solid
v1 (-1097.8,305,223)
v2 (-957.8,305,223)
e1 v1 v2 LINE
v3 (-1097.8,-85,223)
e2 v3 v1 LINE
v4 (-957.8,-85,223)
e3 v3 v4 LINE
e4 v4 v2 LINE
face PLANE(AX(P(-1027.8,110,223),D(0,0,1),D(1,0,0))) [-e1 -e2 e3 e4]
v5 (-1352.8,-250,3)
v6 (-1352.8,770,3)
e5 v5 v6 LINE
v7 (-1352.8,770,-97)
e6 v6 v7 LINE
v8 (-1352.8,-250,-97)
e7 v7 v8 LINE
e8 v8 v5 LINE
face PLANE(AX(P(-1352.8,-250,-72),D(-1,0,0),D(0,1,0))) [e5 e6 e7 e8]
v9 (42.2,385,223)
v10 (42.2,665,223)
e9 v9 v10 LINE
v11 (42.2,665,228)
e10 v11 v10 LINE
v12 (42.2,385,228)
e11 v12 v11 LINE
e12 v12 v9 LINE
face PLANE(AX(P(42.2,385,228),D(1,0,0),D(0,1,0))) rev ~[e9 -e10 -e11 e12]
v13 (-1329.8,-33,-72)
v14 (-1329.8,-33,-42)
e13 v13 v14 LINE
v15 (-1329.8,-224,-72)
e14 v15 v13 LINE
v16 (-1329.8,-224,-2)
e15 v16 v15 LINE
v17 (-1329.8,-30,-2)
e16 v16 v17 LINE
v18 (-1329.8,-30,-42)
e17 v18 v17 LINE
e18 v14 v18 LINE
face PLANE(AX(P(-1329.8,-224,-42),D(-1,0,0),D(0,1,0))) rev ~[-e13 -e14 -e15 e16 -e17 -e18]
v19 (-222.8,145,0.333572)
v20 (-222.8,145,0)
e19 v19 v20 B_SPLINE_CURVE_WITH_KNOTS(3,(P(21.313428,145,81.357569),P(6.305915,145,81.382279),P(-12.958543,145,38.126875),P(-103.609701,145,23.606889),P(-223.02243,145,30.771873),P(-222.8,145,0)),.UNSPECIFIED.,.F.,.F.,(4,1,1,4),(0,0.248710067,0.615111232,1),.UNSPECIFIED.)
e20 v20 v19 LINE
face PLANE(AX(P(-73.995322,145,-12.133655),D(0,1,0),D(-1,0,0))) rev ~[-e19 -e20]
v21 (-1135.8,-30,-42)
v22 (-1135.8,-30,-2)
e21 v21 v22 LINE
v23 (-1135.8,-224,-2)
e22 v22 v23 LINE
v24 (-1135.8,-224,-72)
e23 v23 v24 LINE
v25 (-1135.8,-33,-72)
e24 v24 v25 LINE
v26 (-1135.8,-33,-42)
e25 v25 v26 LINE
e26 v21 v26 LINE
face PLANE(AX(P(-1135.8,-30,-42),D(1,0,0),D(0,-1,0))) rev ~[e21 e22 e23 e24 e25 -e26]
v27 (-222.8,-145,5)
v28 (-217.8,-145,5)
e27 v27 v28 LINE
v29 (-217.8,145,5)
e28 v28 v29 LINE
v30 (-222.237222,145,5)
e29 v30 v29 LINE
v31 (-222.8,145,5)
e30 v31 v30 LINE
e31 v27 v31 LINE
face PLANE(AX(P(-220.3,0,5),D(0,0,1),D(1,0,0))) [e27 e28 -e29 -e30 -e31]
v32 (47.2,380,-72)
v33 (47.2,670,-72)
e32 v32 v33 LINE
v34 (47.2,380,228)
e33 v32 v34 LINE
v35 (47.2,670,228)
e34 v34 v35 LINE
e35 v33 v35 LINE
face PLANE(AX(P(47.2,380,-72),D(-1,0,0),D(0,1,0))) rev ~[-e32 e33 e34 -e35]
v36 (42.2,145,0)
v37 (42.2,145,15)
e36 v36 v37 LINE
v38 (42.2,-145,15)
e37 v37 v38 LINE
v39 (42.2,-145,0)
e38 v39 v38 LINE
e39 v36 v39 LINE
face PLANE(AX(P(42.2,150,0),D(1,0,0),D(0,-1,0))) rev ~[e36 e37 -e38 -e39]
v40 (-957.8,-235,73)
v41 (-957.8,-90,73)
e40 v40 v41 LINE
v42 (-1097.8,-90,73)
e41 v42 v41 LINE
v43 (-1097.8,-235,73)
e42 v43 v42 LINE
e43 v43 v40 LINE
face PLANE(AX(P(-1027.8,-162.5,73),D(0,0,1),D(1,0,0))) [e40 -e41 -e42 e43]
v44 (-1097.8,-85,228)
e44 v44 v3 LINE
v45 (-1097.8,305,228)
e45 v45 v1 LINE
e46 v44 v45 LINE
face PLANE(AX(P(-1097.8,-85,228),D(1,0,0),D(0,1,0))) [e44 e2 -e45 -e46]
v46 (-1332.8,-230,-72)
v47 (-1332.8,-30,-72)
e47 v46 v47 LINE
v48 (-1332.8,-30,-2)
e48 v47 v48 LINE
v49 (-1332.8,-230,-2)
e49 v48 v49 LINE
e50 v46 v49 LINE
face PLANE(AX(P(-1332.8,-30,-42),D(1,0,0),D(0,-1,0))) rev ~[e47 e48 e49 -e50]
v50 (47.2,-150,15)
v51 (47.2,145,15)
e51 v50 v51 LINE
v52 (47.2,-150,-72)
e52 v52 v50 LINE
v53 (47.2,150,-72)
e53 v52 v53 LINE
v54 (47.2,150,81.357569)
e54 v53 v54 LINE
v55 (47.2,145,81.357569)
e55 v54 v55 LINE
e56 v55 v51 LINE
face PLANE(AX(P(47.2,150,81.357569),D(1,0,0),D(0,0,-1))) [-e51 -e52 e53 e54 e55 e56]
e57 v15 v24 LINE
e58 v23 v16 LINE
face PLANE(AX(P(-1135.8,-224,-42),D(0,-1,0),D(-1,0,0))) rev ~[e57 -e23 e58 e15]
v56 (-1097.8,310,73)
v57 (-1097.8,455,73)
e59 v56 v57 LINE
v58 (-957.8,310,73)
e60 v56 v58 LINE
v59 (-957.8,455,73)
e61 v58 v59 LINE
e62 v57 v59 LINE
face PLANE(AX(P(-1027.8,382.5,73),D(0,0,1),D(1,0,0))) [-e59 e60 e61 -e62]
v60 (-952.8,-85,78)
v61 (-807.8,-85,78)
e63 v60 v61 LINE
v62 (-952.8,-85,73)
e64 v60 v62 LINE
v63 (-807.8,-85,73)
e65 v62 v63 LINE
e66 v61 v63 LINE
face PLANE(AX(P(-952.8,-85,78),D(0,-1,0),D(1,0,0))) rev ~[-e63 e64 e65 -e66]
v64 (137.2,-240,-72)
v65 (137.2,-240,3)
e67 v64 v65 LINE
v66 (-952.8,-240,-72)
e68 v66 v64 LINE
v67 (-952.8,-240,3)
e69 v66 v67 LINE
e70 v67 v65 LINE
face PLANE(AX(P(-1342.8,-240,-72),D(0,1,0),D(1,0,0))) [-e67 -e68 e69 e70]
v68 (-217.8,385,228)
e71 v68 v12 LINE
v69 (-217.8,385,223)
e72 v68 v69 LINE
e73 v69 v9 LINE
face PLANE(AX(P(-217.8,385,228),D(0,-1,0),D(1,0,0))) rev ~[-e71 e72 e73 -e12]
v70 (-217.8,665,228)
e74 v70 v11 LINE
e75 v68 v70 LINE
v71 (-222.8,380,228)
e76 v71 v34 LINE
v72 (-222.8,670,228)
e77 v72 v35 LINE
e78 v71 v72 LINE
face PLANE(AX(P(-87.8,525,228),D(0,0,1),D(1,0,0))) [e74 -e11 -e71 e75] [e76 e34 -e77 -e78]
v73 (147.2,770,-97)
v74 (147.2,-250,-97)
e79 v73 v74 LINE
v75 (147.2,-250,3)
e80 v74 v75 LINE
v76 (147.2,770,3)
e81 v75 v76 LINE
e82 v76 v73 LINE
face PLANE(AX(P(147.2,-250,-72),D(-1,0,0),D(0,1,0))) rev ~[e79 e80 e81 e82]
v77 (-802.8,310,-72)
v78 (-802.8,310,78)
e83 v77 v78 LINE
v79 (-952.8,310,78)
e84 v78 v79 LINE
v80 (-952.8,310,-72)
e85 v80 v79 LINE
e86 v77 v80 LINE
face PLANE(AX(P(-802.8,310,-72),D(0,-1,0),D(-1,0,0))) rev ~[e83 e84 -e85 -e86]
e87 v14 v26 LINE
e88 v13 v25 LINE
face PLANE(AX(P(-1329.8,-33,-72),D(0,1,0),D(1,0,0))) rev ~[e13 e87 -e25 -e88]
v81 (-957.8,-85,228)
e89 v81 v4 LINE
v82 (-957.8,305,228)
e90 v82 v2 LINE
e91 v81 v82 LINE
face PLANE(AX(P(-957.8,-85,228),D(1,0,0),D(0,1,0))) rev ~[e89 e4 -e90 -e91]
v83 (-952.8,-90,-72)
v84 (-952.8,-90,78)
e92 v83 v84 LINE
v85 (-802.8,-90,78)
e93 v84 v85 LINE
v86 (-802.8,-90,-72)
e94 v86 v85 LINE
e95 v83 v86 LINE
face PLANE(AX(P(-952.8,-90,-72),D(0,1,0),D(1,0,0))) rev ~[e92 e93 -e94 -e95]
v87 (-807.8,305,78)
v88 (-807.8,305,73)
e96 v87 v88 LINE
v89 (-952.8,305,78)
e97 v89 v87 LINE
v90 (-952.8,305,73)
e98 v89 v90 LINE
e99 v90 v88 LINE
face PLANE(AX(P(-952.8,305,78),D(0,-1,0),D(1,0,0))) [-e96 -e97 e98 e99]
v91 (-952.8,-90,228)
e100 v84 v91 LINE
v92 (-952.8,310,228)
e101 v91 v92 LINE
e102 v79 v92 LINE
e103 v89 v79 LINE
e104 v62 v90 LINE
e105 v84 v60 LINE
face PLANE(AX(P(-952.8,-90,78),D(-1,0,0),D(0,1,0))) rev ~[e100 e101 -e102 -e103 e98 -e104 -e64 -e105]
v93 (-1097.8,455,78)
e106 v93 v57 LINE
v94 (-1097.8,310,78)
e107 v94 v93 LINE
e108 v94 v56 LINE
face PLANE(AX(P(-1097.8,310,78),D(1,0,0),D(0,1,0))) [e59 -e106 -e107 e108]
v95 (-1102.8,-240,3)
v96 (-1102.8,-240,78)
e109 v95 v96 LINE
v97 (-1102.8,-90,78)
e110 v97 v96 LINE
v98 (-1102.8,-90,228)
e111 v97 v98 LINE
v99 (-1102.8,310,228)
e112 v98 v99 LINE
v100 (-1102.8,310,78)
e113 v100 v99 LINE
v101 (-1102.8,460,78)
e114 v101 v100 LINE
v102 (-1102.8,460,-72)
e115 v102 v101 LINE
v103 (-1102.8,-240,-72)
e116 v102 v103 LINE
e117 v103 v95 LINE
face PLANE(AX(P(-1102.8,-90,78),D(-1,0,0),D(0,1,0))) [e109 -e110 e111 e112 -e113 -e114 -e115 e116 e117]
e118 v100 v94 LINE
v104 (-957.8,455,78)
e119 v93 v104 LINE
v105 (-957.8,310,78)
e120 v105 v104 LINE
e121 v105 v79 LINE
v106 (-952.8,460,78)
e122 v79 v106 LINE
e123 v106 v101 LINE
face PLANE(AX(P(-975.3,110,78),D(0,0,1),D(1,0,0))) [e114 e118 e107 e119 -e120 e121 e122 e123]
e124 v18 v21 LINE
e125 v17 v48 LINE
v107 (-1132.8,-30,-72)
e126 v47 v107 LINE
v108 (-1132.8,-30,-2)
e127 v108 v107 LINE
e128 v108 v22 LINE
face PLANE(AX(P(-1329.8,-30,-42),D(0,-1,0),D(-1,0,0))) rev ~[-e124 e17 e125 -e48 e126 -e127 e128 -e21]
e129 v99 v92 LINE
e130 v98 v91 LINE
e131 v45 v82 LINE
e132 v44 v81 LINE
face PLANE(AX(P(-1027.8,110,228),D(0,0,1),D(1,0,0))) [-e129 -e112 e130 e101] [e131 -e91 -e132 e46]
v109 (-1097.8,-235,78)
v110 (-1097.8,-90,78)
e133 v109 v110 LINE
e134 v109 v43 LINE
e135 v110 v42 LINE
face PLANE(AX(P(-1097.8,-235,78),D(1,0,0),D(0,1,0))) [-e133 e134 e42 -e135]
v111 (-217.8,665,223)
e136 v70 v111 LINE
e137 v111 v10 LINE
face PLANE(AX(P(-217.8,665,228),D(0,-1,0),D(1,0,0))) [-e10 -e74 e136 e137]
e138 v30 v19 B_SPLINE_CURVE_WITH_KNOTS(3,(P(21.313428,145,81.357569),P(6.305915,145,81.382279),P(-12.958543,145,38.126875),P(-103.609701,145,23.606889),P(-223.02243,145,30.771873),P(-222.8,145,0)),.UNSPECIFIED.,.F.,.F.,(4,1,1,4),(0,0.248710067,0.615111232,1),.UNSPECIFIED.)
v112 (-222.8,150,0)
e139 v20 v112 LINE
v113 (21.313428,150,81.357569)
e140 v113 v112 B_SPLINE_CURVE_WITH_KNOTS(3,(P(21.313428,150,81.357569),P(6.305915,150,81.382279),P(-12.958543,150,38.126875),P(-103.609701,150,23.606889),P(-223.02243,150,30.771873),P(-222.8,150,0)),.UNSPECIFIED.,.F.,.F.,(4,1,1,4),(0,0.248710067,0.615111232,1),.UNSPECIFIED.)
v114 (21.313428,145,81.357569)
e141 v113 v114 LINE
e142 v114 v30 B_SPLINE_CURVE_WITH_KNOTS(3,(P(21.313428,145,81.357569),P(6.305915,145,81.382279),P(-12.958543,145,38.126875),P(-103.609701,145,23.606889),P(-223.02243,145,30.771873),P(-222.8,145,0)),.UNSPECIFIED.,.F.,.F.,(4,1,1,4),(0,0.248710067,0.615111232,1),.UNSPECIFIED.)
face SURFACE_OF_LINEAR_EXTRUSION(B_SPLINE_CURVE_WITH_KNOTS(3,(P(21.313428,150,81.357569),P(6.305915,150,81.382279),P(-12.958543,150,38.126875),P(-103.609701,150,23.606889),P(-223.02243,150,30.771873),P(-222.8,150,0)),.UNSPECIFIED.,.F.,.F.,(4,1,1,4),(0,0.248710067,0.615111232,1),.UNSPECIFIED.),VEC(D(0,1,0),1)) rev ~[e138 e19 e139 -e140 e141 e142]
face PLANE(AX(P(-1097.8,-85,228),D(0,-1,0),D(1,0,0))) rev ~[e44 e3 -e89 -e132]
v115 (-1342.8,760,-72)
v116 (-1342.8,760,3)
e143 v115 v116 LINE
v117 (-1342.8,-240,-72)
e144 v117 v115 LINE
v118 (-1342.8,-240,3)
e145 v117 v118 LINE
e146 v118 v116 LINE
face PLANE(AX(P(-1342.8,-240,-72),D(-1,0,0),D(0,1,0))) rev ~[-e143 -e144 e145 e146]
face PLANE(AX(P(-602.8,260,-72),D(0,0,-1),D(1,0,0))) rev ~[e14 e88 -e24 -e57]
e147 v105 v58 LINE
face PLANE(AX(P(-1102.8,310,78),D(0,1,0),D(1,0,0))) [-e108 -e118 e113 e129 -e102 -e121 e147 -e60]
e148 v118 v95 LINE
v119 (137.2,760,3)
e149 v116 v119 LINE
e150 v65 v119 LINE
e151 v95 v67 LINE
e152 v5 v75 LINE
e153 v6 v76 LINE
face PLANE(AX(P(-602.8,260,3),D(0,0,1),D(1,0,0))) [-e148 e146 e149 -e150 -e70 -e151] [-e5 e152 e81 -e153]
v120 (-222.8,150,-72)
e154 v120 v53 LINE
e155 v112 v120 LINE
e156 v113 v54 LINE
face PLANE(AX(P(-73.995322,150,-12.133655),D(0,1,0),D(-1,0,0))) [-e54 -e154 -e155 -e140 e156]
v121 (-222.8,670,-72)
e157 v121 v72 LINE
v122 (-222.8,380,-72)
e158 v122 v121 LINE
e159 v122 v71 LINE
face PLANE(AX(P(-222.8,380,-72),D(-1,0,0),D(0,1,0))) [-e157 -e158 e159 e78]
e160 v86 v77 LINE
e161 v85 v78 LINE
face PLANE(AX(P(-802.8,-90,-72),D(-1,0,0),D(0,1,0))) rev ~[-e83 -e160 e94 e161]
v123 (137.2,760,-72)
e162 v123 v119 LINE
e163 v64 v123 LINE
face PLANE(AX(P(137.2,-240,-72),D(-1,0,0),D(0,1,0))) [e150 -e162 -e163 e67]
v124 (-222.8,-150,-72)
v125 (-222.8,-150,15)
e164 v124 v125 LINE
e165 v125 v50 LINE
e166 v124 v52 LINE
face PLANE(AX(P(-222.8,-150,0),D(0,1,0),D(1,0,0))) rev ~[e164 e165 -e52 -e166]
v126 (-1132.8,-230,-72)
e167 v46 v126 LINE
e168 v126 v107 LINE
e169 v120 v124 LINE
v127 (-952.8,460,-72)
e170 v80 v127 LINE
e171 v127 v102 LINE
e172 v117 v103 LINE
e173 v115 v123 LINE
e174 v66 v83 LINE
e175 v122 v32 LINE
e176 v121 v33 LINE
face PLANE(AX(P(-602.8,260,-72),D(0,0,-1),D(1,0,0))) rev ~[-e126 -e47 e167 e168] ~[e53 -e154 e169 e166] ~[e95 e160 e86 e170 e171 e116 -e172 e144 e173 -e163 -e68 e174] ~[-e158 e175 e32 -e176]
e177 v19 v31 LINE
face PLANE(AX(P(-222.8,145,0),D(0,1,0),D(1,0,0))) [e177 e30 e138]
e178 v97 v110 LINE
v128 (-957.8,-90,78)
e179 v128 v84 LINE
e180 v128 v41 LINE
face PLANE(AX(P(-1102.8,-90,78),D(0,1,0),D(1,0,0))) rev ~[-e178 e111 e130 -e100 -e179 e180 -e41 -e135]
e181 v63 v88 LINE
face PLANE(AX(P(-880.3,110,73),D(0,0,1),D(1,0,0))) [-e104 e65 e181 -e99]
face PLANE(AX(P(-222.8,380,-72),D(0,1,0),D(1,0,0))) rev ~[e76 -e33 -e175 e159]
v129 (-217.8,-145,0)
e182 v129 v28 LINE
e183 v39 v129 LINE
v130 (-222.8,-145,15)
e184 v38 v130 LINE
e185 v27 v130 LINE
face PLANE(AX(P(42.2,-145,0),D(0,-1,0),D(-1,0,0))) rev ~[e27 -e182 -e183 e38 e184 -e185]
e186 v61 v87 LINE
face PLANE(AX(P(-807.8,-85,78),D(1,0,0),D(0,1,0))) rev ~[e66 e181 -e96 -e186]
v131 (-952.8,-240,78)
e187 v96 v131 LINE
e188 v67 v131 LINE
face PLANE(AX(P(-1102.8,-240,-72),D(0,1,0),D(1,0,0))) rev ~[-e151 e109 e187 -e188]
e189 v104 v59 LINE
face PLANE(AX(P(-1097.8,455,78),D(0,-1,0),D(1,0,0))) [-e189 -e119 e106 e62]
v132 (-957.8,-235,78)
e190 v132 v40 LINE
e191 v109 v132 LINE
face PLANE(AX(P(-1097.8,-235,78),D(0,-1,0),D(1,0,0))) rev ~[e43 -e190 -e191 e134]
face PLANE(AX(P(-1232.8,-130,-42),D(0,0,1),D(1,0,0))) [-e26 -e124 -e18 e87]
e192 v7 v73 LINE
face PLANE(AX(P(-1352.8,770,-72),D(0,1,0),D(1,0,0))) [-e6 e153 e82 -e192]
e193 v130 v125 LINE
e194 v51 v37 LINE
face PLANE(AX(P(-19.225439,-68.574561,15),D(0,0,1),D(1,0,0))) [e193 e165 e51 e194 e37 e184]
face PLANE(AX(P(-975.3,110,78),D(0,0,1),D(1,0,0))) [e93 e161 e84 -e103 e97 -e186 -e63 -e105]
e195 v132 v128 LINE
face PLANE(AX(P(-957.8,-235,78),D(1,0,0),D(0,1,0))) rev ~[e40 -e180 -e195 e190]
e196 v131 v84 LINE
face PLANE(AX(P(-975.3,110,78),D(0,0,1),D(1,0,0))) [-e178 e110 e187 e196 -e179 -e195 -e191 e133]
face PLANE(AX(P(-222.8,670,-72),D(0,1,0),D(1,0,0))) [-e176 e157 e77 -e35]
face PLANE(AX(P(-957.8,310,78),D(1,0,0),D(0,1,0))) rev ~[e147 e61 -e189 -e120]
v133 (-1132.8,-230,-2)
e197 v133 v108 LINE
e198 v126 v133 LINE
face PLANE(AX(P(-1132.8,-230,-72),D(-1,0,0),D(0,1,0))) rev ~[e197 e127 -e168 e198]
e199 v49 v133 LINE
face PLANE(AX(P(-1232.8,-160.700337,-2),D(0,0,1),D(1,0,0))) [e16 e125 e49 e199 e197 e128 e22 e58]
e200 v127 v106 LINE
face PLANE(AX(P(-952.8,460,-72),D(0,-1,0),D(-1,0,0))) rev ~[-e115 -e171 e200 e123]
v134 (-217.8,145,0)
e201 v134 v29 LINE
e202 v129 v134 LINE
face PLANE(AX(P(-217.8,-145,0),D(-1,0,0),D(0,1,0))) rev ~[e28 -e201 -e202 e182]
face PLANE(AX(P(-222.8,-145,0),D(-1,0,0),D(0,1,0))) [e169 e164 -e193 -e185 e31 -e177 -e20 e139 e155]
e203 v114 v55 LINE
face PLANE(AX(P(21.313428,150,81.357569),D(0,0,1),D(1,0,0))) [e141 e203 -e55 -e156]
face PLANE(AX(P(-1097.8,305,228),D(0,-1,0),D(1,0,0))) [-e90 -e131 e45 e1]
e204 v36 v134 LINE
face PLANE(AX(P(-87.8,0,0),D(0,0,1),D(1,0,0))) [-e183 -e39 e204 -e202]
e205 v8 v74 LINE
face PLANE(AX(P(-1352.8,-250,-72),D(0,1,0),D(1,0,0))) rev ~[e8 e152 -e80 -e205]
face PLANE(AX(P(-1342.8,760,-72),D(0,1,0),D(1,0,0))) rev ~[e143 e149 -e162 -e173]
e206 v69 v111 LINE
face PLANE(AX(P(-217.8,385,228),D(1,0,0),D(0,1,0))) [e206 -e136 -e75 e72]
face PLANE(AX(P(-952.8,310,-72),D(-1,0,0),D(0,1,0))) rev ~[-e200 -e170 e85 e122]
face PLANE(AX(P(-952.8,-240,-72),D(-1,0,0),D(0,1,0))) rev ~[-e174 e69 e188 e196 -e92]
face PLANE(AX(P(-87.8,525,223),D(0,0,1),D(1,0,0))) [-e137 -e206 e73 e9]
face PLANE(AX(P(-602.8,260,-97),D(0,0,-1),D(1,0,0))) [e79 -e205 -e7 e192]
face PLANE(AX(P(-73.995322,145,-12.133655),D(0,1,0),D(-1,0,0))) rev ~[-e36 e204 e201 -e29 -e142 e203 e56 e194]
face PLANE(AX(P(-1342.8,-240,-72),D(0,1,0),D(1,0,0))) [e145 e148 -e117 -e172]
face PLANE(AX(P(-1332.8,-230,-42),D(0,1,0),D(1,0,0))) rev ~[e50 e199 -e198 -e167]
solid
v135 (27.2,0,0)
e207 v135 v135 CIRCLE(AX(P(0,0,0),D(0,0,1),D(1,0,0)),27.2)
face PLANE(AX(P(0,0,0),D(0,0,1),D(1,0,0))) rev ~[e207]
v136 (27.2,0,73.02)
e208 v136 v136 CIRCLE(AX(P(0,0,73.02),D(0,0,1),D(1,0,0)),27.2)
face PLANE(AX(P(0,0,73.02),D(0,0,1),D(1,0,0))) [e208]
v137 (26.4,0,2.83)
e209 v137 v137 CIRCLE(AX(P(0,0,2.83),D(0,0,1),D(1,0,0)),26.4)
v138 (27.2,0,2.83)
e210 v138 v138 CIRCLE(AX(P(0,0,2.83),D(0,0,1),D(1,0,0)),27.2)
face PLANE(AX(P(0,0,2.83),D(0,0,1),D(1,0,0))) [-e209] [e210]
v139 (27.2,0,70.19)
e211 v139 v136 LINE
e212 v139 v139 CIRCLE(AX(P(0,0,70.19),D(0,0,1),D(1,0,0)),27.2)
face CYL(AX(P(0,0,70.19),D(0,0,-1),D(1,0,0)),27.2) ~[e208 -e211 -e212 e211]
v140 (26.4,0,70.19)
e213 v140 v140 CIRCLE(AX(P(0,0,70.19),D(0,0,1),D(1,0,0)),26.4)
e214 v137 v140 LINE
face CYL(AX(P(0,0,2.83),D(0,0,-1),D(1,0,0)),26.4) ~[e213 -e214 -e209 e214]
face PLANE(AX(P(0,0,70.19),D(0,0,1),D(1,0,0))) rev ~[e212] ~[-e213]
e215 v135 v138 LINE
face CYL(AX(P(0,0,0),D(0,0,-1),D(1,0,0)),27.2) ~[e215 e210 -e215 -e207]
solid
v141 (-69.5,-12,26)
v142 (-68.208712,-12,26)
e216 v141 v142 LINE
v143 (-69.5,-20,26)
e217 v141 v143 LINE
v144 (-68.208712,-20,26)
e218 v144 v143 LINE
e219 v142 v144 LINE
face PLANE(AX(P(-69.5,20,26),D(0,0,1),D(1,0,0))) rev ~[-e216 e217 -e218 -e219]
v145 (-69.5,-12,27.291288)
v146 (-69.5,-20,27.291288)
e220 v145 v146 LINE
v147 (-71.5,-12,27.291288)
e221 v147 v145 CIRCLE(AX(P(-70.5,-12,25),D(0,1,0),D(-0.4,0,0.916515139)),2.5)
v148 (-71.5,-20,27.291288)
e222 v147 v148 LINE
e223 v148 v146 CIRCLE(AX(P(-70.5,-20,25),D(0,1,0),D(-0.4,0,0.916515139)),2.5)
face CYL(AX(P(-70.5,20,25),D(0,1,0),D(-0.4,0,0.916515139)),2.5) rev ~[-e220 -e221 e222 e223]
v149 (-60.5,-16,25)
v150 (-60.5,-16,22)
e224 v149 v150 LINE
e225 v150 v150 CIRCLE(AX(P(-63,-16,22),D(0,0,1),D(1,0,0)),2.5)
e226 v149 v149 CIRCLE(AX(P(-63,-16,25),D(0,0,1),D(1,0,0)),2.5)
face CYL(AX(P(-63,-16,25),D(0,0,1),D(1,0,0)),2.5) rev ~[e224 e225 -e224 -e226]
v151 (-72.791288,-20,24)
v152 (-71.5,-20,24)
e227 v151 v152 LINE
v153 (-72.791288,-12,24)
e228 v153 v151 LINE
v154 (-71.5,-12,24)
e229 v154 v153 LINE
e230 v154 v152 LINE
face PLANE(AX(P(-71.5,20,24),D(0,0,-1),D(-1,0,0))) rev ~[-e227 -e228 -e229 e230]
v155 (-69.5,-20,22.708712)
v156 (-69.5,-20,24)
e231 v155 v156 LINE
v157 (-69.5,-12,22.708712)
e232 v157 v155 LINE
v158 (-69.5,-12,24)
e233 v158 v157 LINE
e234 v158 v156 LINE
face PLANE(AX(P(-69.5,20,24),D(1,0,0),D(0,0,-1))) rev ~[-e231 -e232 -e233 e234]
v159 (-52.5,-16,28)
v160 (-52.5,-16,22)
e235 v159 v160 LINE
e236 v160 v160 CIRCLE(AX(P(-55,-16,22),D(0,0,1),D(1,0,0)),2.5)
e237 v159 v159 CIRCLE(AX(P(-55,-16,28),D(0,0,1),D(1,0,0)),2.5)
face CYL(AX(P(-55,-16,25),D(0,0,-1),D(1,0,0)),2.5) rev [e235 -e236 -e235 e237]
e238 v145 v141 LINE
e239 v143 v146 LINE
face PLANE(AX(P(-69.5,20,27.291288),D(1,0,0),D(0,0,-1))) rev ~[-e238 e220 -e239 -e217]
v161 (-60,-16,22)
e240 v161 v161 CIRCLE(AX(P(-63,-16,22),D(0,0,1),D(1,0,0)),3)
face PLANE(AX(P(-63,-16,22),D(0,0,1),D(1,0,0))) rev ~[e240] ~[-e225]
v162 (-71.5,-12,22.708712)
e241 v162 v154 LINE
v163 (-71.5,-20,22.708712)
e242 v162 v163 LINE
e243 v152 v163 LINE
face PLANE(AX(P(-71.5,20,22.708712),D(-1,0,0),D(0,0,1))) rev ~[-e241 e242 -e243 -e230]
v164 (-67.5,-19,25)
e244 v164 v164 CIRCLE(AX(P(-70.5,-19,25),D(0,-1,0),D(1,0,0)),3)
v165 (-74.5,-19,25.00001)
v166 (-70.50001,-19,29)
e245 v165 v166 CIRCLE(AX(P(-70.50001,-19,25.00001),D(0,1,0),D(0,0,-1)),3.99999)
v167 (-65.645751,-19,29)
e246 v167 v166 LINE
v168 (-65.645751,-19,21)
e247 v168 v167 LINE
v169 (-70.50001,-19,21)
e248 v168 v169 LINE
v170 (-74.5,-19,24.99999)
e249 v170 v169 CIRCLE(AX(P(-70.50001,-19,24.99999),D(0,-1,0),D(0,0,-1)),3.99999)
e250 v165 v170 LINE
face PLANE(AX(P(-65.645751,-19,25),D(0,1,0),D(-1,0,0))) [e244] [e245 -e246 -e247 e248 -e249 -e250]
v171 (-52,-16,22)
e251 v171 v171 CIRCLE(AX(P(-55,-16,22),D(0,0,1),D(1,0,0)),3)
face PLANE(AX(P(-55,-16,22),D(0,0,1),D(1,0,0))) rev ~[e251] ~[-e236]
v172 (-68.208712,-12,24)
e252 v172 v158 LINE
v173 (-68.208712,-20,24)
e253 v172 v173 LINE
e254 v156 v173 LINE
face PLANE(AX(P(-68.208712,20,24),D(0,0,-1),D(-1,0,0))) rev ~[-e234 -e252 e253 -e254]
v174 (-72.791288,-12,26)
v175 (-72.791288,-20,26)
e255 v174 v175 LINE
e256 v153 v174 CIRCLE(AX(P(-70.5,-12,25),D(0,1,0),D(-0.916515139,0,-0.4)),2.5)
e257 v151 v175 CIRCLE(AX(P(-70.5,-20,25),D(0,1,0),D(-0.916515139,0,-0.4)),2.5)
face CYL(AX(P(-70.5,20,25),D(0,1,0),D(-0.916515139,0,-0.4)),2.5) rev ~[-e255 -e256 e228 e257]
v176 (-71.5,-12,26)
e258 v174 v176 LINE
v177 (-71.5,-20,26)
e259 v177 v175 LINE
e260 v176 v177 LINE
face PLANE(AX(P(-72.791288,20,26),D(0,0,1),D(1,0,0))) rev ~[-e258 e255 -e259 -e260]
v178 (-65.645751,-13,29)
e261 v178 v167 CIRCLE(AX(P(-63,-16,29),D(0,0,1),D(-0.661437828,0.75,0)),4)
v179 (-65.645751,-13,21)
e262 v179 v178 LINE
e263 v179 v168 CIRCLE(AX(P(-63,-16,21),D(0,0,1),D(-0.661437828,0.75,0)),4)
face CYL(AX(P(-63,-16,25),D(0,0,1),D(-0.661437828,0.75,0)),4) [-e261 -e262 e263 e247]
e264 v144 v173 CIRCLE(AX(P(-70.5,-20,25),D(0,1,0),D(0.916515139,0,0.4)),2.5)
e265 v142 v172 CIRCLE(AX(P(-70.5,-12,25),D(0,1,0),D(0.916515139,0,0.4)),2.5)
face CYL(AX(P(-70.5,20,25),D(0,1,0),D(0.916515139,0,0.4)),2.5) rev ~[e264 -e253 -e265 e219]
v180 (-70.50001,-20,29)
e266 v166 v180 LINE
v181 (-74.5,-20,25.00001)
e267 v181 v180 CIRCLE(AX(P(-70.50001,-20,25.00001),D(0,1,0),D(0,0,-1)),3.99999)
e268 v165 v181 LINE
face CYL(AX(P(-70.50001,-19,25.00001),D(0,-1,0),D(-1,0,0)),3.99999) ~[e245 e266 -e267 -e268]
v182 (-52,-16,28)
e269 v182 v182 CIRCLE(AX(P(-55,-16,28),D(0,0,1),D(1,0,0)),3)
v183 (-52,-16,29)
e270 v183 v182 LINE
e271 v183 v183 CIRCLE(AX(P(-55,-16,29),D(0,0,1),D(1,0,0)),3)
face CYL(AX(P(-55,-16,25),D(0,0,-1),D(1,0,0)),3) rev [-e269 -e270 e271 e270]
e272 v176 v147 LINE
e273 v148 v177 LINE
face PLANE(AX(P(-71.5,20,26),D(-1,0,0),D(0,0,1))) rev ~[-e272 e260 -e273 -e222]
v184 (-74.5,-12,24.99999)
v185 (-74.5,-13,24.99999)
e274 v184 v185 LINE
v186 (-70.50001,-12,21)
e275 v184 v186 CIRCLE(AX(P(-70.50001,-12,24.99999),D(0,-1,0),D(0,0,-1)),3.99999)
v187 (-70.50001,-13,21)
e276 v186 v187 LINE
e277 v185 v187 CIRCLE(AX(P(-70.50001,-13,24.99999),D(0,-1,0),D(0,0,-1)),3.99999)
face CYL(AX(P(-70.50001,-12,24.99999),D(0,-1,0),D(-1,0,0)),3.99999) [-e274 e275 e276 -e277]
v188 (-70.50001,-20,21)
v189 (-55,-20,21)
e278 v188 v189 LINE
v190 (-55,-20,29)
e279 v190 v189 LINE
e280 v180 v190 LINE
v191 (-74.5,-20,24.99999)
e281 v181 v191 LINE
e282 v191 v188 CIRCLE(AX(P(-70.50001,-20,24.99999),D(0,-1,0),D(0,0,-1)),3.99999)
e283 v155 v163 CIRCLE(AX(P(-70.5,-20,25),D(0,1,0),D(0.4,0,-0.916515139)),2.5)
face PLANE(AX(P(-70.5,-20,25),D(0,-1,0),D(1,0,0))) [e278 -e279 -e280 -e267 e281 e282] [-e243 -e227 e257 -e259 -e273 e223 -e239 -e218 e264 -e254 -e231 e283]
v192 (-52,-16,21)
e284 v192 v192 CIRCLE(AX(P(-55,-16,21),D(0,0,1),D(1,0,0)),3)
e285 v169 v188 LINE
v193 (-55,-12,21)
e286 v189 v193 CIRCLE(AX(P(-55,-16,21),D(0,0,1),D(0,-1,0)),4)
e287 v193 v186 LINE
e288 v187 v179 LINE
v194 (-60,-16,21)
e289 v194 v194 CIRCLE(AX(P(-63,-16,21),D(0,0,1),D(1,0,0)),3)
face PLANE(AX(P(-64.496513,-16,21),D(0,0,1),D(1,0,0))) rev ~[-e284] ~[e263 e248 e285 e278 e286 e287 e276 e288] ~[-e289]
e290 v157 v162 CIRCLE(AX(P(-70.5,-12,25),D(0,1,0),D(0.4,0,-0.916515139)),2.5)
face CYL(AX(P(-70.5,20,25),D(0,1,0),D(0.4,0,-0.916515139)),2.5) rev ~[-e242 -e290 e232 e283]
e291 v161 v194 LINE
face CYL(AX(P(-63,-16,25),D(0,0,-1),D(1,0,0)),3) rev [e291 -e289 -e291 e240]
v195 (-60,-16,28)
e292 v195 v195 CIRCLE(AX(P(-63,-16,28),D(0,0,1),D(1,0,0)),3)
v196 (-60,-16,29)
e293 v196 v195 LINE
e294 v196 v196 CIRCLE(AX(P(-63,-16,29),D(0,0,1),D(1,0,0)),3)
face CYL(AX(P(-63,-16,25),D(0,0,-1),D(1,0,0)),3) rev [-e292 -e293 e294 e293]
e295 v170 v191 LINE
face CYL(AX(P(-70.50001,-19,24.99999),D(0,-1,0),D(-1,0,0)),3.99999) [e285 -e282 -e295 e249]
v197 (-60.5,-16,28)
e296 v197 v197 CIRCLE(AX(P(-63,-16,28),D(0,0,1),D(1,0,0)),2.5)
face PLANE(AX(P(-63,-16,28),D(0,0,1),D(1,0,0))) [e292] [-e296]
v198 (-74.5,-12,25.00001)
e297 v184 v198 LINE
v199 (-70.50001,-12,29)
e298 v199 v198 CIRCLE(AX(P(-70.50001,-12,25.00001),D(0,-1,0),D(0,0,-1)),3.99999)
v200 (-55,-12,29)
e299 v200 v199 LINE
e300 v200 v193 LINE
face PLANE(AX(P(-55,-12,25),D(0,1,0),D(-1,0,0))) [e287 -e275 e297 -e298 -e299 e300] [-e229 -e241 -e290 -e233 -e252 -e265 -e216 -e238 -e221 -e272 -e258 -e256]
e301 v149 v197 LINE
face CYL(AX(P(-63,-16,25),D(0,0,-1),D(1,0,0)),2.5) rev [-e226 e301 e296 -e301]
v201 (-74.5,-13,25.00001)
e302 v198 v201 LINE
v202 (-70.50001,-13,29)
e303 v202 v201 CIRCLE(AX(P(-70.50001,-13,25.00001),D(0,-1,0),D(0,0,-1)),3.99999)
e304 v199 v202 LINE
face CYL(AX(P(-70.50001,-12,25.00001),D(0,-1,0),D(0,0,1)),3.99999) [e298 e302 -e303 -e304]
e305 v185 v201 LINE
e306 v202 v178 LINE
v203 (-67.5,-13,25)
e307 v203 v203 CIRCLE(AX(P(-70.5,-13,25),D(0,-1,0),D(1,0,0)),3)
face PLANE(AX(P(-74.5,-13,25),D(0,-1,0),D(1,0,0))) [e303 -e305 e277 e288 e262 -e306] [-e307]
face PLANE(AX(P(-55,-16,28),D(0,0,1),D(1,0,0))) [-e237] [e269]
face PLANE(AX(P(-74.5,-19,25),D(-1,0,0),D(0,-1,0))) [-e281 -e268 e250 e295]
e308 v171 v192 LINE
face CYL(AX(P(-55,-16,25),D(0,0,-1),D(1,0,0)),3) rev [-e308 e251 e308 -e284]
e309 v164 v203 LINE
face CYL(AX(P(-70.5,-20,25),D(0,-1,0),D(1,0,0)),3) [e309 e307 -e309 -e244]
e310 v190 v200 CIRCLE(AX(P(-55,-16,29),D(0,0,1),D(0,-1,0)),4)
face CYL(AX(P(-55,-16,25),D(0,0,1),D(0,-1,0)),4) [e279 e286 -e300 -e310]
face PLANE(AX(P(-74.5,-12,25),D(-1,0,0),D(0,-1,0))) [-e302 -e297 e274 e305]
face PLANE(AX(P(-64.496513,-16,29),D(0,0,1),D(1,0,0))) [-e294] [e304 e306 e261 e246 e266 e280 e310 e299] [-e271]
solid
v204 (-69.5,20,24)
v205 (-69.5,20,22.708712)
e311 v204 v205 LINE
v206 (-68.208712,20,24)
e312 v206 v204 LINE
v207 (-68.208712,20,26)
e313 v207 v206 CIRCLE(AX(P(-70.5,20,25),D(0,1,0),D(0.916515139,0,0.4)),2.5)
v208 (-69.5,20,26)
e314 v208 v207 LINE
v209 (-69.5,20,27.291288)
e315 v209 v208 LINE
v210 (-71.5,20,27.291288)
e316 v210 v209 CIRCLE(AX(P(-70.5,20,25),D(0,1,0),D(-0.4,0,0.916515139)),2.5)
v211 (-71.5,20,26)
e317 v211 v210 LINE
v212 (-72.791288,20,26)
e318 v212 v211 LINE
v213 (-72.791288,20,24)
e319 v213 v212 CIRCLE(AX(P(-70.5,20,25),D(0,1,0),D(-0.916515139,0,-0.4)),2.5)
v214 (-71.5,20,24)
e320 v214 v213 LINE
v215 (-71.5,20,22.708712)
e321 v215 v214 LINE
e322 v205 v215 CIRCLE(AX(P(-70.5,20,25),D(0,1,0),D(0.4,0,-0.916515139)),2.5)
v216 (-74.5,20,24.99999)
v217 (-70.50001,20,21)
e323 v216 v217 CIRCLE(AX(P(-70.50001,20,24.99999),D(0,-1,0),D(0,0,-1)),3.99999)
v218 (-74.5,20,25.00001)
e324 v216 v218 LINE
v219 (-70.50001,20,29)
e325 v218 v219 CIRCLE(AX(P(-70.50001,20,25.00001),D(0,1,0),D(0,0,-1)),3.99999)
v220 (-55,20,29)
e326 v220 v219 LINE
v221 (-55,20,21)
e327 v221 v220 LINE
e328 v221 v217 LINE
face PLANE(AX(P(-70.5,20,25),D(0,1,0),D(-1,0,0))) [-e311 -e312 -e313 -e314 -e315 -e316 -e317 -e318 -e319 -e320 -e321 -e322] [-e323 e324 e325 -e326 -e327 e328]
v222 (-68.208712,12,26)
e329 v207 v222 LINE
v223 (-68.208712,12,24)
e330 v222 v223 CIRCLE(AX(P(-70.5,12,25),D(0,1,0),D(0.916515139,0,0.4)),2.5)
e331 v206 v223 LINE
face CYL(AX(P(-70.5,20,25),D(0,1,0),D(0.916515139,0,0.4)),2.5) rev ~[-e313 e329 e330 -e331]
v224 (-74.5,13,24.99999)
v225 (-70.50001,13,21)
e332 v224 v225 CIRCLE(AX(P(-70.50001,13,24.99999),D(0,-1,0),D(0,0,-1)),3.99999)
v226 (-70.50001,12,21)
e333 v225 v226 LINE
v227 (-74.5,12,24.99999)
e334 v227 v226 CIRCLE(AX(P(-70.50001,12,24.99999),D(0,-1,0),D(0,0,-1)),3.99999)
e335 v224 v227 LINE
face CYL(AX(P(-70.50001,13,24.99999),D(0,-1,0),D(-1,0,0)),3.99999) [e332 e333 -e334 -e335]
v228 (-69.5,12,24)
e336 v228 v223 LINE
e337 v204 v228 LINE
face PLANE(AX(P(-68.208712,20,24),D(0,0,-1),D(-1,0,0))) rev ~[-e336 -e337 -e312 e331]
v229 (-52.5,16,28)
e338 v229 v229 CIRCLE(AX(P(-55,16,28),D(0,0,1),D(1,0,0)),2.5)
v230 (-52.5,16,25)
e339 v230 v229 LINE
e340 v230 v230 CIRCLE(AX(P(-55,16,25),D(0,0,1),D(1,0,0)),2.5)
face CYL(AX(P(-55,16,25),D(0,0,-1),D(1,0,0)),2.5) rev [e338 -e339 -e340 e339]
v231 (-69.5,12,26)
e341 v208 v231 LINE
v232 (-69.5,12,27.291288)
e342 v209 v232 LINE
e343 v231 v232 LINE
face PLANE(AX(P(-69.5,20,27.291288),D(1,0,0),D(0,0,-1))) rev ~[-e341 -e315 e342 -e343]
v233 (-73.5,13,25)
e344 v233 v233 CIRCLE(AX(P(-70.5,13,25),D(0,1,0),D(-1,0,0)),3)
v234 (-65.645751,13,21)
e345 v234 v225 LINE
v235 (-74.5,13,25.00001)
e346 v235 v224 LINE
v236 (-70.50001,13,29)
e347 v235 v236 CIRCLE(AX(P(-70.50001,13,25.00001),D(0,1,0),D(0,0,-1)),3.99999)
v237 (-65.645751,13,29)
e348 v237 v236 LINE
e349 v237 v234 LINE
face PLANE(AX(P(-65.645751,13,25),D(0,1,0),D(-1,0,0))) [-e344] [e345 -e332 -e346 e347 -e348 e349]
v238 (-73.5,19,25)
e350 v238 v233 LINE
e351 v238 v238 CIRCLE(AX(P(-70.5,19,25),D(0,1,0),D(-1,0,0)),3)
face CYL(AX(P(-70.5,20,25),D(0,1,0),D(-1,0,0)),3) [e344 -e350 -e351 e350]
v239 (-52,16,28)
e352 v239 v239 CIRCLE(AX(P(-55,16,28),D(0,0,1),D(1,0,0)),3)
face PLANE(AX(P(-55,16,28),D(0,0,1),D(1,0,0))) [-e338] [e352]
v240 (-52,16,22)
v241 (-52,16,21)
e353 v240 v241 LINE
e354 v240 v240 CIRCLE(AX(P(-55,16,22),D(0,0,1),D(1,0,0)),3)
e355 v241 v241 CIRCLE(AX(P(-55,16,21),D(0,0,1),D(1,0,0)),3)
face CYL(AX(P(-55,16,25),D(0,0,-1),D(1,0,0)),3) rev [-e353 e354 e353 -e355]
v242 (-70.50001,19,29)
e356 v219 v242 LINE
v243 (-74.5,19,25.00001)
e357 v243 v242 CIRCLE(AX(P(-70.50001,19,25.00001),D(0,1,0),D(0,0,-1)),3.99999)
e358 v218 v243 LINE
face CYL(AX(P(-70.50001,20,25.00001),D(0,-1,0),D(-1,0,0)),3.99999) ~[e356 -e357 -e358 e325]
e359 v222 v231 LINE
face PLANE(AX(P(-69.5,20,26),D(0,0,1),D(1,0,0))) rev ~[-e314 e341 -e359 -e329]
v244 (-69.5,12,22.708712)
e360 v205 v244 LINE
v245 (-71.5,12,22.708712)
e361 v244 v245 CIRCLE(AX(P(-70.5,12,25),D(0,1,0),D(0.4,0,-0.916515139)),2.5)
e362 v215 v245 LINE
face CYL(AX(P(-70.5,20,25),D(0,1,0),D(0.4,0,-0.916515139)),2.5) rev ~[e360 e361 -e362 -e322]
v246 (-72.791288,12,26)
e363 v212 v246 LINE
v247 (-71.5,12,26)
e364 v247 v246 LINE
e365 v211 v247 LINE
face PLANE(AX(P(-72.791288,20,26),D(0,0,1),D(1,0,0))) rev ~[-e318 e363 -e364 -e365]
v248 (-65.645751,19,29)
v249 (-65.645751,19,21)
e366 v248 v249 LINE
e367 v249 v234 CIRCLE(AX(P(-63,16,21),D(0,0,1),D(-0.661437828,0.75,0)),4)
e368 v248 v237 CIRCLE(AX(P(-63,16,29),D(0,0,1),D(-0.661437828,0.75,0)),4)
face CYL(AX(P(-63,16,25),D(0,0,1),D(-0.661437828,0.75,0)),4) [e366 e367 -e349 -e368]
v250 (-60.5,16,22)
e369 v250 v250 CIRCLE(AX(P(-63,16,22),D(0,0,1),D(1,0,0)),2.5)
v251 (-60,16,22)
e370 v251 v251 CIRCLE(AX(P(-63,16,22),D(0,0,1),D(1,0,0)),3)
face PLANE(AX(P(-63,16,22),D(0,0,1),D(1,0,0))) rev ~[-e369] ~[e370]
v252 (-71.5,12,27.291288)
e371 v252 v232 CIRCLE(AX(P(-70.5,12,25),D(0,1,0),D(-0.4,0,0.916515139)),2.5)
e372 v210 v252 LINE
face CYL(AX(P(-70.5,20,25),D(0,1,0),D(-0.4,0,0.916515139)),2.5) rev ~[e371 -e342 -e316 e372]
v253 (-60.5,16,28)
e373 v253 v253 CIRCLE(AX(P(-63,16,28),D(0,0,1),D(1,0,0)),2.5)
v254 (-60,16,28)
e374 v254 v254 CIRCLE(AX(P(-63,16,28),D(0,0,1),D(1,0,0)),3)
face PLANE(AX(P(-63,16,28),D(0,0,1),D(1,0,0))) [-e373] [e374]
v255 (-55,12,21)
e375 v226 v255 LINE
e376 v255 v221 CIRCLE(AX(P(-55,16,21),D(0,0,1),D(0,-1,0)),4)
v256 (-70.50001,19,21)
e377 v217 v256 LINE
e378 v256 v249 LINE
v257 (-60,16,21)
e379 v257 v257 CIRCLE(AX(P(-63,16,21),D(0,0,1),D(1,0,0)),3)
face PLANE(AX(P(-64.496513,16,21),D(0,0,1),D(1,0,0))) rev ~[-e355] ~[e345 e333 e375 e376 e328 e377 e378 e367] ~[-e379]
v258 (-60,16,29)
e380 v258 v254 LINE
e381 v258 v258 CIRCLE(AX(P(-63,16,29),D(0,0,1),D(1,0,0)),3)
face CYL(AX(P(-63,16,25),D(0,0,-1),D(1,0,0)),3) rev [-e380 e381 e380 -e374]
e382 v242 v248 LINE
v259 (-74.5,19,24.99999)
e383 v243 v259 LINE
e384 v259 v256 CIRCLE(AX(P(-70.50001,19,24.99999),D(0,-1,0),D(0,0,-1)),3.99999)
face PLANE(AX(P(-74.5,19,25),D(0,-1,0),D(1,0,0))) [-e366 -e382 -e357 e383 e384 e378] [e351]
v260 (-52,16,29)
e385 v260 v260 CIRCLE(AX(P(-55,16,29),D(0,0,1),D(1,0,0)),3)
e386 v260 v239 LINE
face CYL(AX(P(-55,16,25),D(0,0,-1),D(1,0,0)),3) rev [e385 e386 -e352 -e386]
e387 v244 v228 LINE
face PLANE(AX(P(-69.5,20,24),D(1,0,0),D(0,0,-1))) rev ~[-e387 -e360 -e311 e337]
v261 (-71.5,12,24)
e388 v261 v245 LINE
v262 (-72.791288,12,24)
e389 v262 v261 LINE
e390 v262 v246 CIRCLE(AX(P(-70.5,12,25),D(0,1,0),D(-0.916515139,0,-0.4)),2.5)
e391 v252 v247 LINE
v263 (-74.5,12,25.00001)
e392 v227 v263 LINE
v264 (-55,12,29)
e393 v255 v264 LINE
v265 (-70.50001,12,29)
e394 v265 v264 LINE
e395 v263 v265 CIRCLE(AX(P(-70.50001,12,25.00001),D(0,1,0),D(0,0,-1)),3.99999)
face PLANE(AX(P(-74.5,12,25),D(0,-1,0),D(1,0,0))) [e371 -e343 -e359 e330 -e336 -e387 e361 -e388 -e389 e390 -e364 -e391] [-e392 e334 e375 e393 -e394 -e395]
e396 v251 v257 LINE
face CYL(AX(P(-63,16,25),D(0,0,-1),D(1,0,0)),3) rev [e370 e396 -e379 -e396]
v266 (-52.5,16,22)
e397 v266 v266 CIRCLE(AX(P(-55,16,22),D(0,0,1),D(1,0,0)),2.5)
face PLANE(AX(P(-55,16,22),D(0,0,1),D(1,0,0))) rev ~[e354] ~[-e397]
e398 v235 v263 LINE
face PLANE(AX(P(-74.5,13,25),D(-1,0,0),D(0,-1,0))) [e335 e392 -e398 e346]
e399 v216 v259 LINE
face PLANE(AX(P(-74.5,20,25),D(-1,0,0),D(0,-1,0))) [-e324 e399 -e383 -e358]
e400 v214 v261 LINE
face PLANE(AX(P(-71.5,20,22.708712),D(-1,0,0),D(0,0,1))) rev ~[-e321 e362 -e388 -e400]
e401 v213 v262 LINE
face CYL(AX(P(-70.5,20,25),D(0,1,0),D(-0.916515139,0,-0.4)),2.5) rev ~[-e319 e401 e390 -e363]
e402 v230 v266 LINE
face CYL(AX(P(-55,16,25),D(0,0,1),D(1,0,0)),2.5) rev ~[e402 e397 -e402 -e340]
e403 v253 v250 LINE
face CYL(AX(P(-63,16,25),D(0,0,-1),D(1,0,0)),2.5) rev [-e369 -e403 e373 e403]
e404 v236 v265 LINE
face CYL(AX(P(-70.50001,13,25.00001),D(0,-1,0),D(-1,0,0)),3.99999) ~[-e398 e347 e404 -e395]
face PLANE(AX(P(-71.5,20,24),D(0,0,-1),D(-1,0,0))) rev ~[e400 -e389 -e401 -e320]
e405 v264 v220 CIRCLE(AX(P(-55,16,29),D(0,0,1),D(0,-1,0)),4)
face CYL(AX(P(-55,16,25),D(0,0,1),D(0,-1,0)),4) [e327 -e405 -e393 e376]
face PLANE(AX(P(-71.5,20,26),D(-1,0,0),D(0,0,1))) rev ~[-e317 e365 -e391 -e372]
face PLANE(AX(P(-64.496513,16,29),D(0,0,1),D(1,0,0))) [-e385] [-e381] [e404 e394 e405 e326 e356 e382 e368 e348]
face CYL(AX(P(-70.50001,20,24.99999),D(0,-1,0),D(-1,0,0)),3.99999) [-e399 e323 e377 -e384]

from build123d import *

# Parameters (mm, degrees)
F0_R      = 27.2
F1_DEPTH  = 2.83
F2_R      = 26.4
F3_DEPTH  = 67.36
F4_R      = 27.2
F5_DEPTH  = 2.83
F9_W      = 270
F9_H      = 300
F10_DEPTH = 72
F12_DEPTH = 15
F14_DEPTH = 5
F15_W     = 5
F15_H     = 290
F16_DEPTH = 5
F17_W     = 1500
F17_H     = 1020
F18_DEPTH = 25
F19_W     = 270
F19_H     = 290
F20_DEPTH = 300
F21_W     = 260
F21_H     = 280
F22_DEPTH = 5
F23_W     = 1500
F23_H     = 1020
F23_W_2   = 1480
F23_H_2   = 1000
F24_DEPTH = 75
F26_DEPTH = 150
F27_W     = 150
F27_H     = 400
F28_DEPTH = 150
F29_W     = 140
F29_H     = 390
F30_DEPTH = 5
F31_W     = 140
F31_H     = 145
F31_W_2   = 145
F31_H_2   = 390
F32_DEPTH = 5
F33_R     = 3
F34_DEPTH = 4
F35_R     = 3.99999
F35_2_R   = 3.99999
F36_R     = 3
F37_DEPTH = 8
F38_R     = 3
F39_DEPTH = 8
F40_R     = 3
F40_R_2   = 2.5
F41_DEPTH = 3
F42_R     = 3
F42_R_2   = 2.5
F43_DEPTH = 3
F45_DEPTH = 270.001
F46_W     = 200
F46_H     = 200
F46_W_2   = 194
F46_H_2   = 191
F47_DEPTH = 30
F49_DEPTH = 40


# Not quite as in the source:
# - a fillet or chamfer is up to 0.001 mm smaller than in the source, because OpenCascade refuses the exact size
# - a feature names something its author has since deleted; it is built from what else it names


with BuildPart() as f1:
    # F0 (on Top) → F1 (new body)
    with BuildSketch(Plane.XY):
        Circle(F0_R)
    extrude(amount=F1_DEPTH)

    # F2 (on face) → F3 (join)
    with BuildSketch(Plane.XY.offset(2.83)):
        Circle(F2_R)
    extrude(amount=F3_DEPTH)

    # F4 (on face) → F5 (join)
    with BuildSketch(Plane.XY.offset(70.19)):
        Circle(F4_R)
    extrude(amount=F5_DEPTH)


with BuildPart() as f10:
    # F9 (on Top) → F10 (new body)
    with BuildSketch(Plane.XY):
        with Locations((-87.8, 0)):
            Rectangle(F9_W, F9_H)
    extrude(amount=-F10_DEPTH)

    # F11 (on face) → F12 (join)
    with BuildSketch(Plane.XY):
        Polygon((-222.8, -145), (-222.8, -150), (47.2, -150), (47.2, 150), (42.2, 150), (42.2, -145), align=None)
    extrude(amount=F12_DEPTH)

    # F13 (on face) → F14 (join)
    with BuildSketch(Plane(origin=(0, 150, 0), x_dir=(-1, 0, 0), z_dir=(0, 1, 0))):
        with BuildLine():
            Line((-21.3134280931, 81.3575685024), (-47.2, 81.3575685024))
            Line((-47.2, 81.3575685024), (-47.2, -72))
            Line((-47.2, -72), (222.8, -72))
            Line((222.8, -72), (222.8, 0))
            add(Edge.make_bspline(
                [(-21.3134280931, 81.3575685024), (-6.3059147253, 81.3822787863), (12.9585432644, 38.1268753575), (103.6097013063, 23.6068887567), (223.0224295336, 30.7718731823), (222.8, 0)],
                knots=[0, 0, 0, 0, 0.2487100673, 0.6151112321, 1, 1, 1, 1], degree=3))
        make_face()
    extrude(amount=-F14_DEPTH)

    # F15 (on face) → F16 (join)
    with BuildSketch(Plane.XY):
        with Locations((-220.3, 0)):
            Rectangle(F15_W, F15_H)
    extrude(amount=F16_DEPTH)

    # F17 (on face) → F18 (join)
    with BuildSketch(Plane(origin=(0, 0, -72), x_dir=(1, 0, 0), z_dir=(0, 0, -1))):
        with Locations((-602.8, -260)):
            Rectangle(F17_W, F17_H)
    extrude(amount=F18_DEPTH)

    # F19 (on face) → F20 (join)
    with BuildSketch(Plane.XY.offset(-72)):
        with Locations((-87.8, 525)):
            Rectangle(F19_W, F19_H)
    extrude(amount=F20_DEPTH)

    # F21 (on face) → F22 (cut)
    with BuildSketch(Plane.XY.offset(228)):
        with Locations((-87.8, 525)):
            Rectangle(F21_W, F21_H)
    extrude(amount=-F22_DEPTH, mode=Mode.SUBTRACT)

    # F23 (on face) → F24 (join)
    with BuildSketch(Plane.XY.offset(-72)):
        with Locations((-602.8, 260)):
            Rectangle(F23_W, F23_H)
        with Locations((-602.8, 260)):
            Rectangle(F23_W_2, F23_H_2, mode=Mode.SUBTRACT)
    extrude(amount=F24_DEPTH)

    # F25 (on face) → F26 (join)
    with BuildSketch(Plane.XY.offset(-72)):
        Polygon((-952.8, 460), (-1102.8, 460), (-1102.8, -240), (-952.8, -240), (-952.8, -90), (-802.8, -90), (-802.8, 310), (-952.8, 310), align=None)
    extrude(amount=F26_DEPTH)

    # F27 (on face) → F28 (join)
    with BuildSketch(Plane.XY.offset(78)):
        with Locations((-1027.8, 110)):
            Rectangle(F27_W, F27_H)
    extrude(amount=F28_DEPTH)

    # F29 (on face) → F30 (cut)
    with BuildSketch(Plane.XY.offset(228)):
        with Locations((-1027.8, 110)):
            Rectangle(F29_W, F29_H)
    extrude(amount=-F30_DEPTH, mode=Mode.SUBTRACT)

    # F31 (on face) → F32 (cut)
    with BuildSketch(Plane.XY.offset(78)):
        with Locations((-1027.8, 382.5)):
            Rectangle(F31_W, F31_H)
        with Locations((-880.3, 110)):
            Rectangle(F31_W_2, F31_H_2)
        with Locations((-1027.8, -162.5)):
            Rectangle(F31_W, F31_H)
    extrude(amount=-F32_DEPTH, mode=Mode.SUBTRACT)

    # F46 (on face) → F47 (join)
    with BuildSketch(Plane.XY.offset(-72)):
        with Locations((-1232.8, -130)):
            Rectangle(F46_W, F46_H)
        with Locations((-1232.8, -128.5)):
            Rectangle(F46_W_2, F46_H_2, mode=Mode.SUBTRACT)
    extrude(amount=F47_DEPTH)

    # F48 (on face) → F49 (join)
    with BuildSketch(Plane.XY.offset(-42)):
        Polygon((-1329.8, -30), (-1332.8, -30), (-1332.8, -230), (-1329.8, -230), (-1135.8, -230), (-1132.8, -230), (-1132.8, -30), (-1135.8, -30), (-1135.8, -224), (-1329.8, -224), align=None)
    extrude(amount=F49_DEPTH)


with BuildPart() as f34:
    # F33 (on offset) → F34 (new body, symmetric)
    with BuildSketch(Plane.XY.offset(25)):
        with BuildLine():
            Line((-55, -12), (-74.5, -12))
            Line((-74.5, -12), (-74.5, -13))
            Line((-74.5, -13), (-65.6457513111, -13))
            ThreePointArc((-65.6457513111, -13), (-67, -16), (-65.6457513111, -19))
            Line((-65.6457513111, -19), (-74.5, -19))
            Line((-74.5, -19), (-74.5, -20))
            Line((-74.5, -20), (-55, -20))
            ThreePointArc((-55, -20), (-51, -16), (-55, -12))
        make_face()
        with Locations((-63, -16)):
            Circle(F33_R, mode=Mode.SUBTRACT)
        with Locations((-55, -16)):
            Circle(F33_R, mode=Mode.SUBTRACT)
    extrude(amount=F34_DEPTH, both=True)

    # F35 (radius 4 in the source; OpenCascade refuses exactly that, so slightly less here)
    f35_edges = [f34.edges().sort_by_distance(p)[0] for p in [
        (-74.5, -19.5, 29),
        (-74.5, -12.5, 29),
        (-74.5, -19.5, 21),
        (-74.5, -12.5, 21),
    ]]
    fillet(f35_edges, radius=F35_R)

    # F36 (on face) → F37 (join, through all)
    with BuildSketch(Plane.XZ.offset(20)):
        with Locations((-70.5, 25)):
            Circle(F36_R)
    extrude(amount=-F37_DEPTH)

    # F42 (on offset) → F43 (join, symmetric)
    with BuildSketch(Plane.XY.offset(25)):
        with Locations((-63, -16)):
            Circle(F42_R)
        with Locations((-63, -16)):
            Circle(F42_R_2, mode=Mode.SUBTRACT)
        with Locations((-55, -16)):
            Circle(F42_R)
        with Locations((-55, -16)):
            Circle(F42_R_2, mode=Mode.SUBTRACT)
    extrude(amount=F43_DEPTH, both=True)


with BuildPart() as f34b:
    # F33 (on offset) → F34, piece 2 (new body, symmetric)
    with BuildSketch(Plane.XY.offset(25)):
        with BuildLine():
            Line((-74.5, 13), (-74.5, 12))
            Line((-74.5, 12), (-55, 12))
            ThreePointArc((-55, 12), (-51, 16), (-55, 20))
            Line((-55, 20), (-74.5, 20))
            Line((-74.5, 20), (-74.5, 19))
            Line((-74.5, 19), (-65.6457513111, 19))
            ThreePointArc((-65.6457513111, 19), (-67, 16), (-65.6457513111, 13))
            Line((-65.6457513111, 13), (-74.5, 13))
        make_face()
        with Locations((-63, 16)):
            Circle(F33_R, mode=Mode.SUBTRACT)
        with Locations((-55, 16)):
            Circle(F33_R, mode=Mode.SUBTRACT)
    extrude(amount=F34_DEPTH, both=True)

    # F35#2 (radius 4 in the source; OpenCascade refuses exactly that, so slightly less here)
    f35_2_edges = [f34b.edges().sort_by_distance(p)[0] for p in [
        (-74.5, 12.5, 29),
        (-74.5, 19.5, 29),
        (-74.5, 19.5, 21),
        (-74.5, 12.5, 21),
    ]]
    fillet(f35_2_edges, radius=F35_2_R)

    # F38 (on face) → F39 (join, through all)
    with BuildSketch(Plane(origin=(0, 20, 0), x_dir=(-1, 0, 0), z_dir=(0, 1, 0))):
        with Locations((70.5, 25)):
            Circle(F38_R)
    extrude(amount=-F39_DEPTH)

    # F40 (on offset) → F41 (join, symmetric)
    with BuildSketch(Plane.XY.offset(25)):
        with Locations((-55, 16)):
            Circle(F40_R)
        with Locations((-55, 16)):
            Circle(F40_R_2, mode=Mode.SUBTRACT)
        with Locations((-63, 16)):
            Circle(F40_R)
        with Locations((-63, 16)):
            Circle(F40_R_2, mode=Mode.SUBTRACT)
    extrude(amount=F41_DEPTH, both=True)


with BuildPart() as f45_tool:
    # F44 (on face) → F45 (new body, through all)
    with BuildSketch(Plane(origin=(0, 20, 0), x_dir=(-1, 0, 0), z_dir=(0, 1, 0))):
        with BuildLine():
            Line((71.5, 26), (71.5, 27.2912878475))
            ThreePointArc((71.5, 27.2912878475), (70.5, 27.5), (69.5, 27.2912878475))
            Line((69.5, 27.2912878475), (69.5, 26))
            Line((69.5, 26), (68.2087121525, 26))
            ThreePointArc((68.2087121525, 26), (68, 25), (68.2087121525, 24))
            Line((68.2087121525, 24), (69.5, 24))
            Line((69.5, 24), (69.5, 22.7087121525))
            ThreePointArc((69.5, 22.7087121525), (70.5, 22.5), (71.5, 22.7087121525))
            Line((71.5, 22.7087121525), (71.5, 24))
            Line((71.5, 24), (72.7912878475, 24))
            ThreePointArc((72.7912878475, 24), (73, 25), (72.7912878475, 26))
            Line((72.7912878475, 26), (71.5, 26))
        make_face()
    extrude(amount=-F45_DEPTH)


with BuildPart() as f34_1:
    add(f34.part)

    # F45: cut by f45_tool
    add(f45_tool.part, mode=Mode.SUBTRACT)


with BuildPart() as f34b_1:
    add(f34b.part)

    # F45: cut by f45_tool
    add(f45_tool.part, mode=Mode.SUBTRACT)


solid = Compound([f1.part, f10.part, f34_1.part, f34b_1.part])
